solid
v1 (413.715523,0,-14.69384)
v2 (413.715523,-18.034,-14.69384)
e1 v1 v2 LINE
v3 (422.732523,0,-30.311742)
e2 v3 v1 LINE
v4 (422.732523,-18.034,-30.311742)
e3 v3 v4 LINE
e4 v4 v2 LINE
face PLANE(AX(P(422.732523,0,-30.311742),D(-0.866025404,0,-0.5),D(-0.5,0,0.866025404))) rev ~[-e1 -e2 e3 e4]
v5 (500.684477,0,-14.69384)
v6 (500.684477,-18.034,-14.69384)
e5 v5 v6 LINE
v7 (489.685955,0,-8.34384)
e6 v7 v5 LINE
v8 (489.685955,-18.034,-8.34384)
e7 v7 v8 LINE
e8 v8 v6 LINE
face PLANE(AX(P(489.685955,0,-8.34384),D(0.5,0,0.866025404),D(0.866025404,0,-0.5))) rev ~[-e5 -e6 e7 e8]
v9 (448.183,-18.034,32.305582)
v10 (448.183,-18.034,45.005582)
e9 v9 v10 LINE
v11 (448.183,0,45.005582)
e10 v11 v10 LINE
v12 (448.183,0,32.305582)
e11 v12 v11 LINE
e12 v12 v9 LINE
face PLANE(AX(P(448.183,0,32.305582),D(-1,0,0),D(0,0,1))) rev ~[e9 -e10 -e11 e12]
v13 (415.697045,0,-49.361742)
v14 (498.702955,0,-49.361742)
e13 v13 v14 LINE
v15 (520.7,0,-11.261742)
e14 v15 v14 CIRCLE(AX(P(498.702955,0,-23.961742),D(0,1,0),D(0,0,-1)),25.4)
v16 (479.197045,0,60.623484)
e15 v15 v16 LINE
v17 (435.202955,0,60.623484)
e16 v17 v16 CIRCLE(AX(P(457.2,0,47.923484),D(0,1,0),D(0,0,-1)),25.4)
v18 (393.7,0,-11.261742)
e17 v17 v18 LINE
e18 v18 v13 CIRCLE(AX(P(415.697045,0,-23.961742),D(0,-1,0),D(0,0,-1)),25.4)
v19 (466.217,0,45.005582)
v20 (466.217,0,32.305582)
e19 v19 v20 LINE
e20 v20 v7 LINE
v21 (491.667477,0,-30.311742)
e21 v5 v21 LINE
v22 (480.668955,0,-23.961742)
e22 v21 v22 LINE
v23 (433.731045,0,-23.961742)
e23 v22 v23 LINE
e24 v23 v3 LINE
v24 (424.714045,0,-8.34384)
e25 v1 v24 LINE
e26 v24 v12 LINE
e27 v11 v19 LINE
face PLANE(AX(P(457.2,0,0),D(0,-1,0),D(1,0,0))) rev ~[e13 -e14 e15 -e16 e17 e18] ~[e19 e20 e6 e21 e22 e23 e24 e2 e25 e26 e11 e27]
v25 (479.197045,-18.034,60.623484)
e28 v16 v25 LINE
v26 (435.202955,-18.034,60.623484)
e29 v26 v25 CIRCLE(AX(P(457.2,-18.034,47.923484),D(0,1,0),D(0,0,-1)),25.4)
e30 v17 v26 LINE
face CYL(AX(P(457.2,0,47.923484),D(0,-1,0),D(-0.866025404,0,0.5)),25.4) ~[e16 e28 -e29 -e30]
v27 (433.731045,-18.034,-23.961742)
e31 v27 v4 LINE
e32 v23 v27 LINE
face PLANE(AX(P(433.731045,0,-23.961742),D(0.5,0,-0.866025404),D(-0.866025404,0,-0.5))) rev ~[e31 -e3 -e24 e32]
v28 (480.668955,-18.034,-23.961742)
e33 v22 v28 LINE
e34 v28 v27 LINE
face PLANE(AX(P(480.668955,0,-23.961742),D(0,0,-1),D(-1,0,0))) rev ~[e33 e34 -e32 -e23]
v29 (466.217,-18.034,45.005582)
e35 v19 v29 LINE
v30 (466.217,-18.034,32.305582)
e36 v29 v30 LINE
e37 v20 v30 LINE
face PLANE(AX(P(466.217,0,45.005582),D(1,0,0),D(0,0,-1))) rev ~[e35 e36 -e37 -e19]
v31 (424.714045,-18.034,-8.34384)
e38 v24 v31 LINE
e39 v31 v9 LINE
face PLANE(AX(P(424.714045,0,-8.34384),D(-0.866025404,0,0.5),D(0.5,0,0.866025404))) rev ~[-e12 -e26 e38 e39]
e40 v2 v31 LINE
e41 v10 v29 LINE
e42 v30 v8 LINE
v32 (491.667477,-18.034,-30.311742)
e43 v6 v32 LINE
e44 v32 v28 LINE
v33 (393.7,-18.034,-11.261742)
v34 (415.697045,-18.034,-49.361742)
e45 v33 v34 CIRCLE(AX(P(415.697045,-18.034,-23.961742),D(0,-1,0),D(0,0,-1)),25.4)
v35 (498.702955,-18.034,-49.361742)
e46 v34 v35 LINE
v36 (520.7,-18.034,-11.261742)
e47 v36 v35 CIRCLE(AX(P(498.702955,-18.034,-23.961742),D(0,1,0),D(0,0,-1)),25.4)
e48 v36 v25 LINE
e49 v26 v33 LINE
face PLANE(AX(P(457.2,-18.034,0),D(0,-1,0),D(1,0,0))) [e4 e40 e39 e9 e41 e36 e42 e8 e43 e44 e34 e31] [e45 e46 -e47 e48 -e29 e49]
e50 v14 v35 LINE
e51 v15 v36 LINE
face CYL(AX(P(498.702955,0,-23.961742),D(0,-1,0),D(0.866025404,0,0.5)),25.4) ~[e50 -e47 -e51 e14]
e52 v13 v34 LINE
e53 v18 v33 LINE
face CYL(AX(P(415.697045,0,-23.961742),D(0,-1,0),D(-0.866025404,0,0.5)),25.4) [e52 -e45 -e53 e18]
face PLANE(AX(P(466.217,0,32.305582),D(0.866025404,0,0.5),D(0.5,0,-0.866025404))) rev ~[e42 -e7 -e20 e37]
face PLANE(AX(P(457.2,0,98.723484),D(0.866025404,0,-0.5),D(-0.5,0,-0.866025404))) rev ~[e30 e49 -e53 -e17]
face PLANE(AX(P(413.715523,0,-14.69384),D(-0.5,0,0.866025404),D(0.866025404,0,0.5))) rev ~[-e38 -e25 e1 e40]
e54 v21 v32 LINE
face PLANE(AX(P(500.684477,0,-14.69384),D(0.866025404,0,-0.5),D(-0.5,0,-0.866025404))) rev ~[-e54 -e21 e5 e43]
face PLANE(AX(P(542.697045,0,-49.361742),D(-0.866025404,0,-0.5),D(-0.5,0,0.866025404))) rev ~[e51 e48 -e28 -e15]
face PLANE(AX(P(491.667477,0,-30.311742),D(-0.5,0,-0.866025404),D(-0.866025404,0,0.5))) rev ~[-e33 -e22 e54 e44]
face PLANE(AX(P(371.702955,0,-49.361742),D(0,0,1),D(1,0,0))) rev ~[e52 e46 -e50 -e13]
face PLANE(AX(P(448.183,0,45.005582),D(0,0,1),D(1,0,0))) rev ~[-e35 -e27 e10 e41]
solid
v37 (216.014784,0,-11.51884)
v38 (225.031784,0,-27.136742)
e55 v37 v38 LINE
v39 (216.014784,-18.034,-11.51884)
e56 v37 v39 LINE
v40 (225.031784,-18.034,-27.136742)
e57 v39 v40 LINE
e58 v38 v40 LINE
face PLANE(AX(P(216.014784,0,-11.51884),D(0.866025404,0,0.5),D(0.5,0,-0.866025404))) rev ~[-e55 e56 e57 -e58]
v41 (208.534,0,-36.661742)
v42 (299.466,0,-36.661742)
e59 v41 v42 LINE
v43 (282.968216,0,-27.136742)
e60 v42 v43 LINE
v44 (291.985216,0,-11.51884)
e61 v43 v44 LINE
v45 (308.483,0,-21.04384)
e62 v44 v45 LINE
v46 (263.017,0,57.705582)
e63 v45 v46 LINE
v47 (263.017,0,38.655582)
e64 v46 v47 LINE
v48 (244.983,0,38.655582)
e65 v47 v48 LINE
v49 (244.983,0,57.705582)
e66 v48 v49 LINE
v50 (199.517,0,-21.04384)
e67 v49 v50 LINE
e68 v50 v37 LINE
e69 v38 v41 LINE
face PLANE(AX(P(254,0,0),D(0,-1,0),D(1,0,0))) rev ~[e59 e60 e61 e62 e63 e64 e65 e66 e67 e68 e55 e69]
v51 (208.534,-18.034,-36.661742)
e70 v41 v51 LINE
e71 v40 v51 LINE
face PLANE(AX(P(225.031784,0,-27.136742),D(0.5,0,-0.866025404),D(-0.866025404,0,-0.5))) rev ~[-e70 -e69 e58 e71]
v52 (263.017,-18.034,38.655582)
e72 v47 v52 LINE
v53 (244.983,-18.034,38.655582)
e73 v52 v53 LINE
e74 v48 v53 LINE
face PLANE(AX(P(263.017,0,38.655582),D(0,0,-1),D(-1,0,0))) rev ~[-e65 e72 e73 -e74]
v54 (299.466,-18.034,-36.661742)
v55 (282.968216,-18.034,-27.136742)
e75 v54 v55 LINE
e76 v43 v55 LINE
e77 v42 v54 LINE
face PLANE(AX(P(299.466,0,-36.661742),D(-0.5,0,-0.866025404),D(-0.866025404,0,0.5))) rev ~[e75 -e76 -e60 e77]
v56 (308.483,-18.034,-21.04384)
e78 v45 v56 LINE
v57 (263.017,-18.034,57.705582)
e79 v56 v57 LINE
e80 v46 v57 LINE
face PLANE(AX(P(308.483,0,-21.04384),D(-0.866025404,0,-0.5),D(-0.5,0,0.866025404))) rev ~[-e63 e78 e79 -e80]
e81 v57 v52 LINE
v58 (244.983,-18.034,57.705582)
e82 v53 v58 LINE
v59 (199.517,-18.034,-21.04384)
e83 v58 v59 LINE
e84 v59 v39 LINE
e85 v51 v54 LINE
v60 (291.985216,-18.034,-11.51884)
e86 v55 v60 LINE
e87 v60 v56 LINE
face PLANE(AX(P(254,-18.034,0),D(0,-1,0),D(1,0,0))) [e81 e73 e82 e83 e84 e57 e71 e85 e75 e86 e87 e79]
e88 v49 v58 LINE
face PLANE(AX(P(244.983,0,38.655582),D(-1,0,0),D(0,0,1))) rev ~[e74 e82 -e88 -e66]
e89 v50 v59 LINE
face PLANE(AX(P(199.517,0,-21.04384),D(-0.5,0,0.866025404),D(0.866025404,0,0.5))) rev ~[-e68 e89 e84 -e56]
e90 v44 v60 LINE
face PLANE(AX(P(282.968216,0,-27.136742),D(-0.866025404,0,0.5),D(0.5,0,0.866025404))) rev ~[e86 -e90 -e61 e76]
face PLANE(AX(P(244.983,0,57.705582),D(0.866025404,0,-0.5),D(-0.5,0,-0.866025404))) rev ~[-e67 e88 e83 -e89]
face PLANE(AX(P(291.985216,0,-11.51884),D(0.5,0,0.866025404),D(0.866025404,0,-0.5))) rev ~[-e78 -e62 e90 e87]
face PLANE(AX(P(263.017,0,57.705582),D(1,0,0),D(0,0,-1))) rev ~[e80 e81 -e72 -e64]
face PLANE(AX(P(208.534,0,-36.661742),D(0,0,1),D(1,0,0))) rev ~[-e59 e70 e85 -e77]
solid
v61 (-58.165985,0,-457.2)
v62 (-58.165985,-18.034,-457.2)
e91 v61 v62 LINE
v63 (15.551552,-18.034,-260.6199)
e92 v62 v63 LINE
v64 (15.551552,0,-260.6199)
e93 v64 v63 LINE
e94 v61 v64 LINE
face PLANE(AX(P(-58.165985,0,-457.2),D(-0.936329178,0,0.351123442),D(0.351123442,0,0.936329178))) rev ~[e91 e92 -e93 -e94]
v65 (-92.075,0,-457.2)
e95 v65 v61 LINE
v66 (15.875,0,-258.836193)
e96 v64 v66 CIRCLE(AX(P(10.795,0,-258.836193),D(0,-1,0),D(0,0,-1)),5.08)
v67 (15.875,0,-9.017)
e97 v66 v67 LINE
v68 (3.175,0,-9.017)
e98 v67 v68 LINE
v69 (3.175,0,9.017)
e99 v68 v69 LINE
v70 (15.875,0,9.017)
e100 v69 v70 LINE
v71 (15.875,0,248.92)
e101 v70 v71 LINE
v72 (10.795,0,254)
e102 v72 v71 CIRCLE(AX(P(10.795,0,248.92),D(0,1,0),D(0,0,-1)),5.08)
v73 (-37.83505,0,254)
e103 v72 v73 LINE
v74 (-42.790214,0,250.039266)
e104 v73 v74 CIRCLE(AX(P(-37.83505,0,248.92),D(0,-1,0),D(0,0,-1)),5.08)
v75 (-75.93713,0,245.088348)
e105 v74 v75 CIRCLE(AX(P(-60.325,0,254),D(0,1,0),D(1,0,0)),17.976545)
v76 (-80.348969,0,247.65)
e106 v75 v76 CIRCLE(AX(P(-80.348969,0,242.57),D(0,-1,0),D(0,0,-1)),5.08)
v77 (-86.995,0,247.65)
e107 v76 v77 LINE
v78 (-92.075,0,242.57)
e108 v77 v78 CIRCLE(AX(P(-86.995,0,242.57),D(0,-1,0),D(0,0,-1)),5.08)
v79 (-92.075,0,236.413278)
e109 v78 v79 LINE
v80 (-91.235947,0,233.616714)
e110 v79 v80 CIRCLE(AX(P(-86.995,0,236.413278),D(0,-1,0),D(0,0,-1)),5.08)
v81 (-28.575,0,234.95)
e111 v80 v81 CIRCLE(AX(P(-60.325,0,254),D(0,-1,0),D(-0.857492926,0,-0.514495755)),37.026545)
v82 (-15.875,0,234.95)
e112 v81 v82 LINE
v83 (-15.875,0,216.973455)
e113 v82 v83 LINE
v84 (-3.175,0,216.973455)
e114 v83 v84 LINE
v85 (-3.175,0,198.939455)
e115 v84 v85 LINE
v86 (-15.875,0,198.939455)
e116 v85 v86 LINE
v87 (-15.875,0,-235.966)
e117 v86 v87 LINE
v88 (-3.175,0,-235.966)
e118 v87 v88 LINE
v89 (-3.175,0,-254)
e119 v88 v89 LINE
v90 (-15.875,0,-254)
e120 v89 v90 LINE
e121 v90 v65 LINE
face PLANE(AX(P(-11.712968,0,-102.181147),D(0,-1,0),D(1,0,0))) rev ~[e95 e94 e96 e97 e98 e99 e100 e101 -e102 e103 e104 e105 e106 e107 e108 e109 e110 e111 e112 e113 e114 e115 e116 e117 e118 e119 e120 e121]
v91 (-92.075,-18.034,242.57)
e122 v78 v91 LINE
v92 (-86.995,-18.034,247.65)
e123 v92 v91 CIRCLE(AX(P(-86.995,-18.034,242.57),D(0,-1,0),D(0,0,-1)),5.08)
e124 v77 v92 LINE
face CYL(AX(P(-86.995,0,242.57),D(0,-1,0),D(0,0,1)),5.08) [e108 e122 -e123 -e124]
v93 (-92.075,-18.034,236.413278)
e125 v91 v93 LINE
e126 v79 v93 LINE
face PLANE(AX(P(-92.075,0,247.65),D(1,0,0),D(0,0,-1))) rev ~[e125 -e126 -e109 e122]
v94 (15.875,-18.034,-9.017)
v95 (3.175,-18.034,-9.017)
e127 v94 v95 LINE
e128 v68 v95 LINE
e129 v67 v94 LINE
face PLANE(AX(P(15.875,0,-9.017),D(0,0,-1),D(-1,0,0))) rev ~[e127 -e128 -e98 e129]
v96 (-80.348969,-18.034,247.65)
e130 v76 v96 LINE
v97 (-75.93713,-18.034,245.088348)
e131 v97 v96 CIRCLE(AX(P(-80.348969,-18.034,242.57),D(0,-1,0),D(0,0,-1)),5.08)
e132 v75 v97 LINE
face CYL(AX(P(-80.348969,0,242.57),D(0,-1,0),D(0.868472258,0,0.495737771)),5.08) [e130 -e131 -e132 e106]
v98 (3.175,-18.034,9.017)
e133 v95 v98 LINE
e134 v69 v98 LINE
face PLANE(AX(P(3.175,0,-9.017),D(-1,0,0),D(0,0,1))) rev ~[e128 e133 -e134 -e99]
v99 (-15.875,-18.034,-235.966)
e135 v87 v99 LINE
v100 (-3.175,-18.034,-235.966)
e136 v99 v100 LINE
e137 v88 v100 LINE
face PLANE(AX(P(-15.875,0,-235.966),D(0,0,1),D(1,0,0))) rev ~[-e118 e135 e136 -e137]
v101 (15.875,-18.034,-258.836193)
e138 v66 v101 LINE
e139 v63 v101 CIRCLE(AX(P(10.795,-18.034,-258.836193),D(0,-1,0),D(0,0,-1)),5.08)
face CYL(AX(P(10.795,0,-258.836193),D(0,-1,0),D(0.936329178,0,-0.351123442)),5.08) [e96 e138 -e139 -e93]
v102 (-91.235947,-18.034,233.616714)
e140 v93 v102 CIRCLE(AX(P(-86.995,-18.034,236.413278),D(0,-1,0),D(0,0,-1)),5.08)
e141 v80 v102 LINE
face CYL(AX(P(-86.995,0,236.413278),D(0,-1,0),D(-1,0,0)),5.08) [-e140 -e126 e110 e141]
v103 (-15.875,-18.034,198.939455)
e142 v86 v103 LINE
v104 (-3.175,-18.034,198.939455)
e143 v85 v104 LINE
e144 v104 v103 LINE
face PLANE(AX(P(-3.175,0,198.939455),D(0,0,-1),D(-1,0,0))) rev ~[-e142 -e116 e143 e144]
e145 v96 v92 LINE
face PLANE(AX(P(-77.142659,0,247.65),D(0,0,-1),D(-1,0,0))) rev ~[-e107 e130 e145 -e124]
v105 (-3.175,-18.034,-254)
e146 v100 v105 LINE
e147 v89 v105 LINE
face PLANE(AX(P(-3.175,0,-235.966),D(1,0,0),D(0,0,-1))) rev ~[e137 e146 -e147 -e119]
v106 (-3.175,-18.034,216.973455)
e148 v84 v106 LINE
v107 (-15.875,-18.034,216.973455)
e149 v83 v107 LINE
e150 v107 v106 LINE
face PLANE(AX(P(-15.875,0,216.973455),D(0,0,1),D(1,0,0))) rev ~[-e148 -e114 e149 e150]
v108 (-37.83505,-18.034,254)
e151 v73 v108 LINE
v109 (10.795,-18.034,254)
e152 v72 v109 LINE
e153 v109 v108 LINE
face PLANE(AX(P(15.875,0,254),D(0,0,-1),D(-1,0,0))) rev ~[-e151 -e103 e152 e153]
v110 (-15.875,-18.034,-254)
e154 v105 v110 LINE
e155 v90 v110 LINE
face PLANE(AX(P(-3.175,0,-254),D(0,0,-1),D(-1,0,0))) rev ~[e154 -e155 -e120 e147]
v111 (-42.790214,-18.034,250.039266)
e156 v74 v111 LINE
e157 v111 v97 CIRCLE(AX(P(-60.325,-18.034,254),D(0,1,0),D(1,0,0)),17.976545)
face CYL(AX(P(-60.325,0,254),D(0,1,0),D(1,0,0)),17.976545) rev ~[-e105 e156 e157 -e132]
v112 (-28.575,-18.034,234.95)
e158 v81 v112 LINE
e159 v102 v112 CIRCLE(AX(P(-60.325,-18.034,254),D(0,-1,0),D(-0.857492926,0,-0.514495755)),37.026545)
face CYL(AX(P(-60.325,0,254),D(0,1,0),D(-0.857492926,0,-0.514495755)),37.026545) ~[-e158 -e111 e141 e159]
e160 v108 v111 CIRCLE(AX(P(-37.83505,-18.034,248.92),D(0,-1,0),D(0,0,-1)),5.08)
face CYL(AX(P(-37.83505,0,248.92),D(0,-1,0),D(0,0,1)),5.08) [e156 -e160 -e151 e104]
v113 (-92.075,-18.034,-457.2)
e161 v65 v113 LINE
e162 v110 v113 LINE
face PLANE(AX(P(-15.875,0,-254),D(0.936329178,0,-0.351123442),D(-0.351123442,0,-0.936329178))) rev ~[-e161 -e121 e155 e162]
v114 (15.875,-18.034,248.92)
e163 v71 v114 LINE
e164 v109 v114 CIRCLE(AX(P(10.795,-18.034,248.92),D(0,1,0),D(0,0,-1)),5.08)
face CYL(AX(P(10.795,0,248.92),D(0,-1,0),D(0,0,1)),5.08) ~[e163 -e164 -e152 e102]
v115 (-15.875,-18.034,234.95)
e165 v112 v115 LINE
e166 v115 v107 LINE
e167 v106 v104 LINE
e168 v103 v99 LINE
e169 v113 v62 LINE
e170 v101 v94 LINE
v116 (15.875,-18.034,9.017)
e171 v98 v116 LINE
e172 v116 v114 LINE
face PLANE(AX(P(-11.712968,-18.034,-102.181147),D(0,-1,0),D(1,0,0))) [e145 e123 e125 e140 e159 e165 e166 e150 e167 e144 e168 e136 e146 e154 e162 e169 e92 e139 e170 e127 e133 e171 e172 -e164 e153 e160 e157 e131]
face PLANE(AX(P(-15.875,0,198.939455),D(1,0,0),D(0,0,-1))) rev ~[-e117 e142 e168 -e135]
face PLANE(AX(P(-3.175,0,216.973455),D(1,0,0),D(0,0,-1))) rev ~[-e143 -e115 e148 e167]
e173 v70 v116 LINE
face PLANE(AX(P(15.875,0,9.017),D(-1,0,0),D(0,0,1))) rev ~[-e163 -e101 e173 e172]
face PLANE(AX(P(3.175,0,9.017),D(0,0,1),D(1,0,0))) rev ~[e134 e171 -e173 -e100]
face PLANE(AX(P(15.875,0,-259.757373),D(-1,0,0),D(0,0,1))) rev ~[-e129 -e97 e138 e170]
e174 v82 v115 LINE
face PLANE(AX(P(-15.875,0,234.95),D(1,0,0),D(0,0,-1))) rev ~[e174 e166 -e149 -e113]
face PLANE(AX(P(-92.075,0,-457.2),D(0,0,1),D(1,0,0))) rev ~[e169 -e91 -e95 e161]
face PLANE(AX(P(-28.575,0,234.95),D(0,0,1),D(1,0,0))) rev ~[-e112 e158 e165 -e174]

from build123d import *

# Parameters (mm, degrees)
F2_DEPTH = 18.034
F1_W     = 12.7
F1_H     = 19.05
F3_R     = 25.4
F4_R     = 5.08


# Not quite as in the source:
# - a variable given as a bare number and used for a length is read in inches; the dataset says mm whatever the document's units were


with BuildPart() as f2:
    # F1 (on Front) → F2 (new body)
    with BuildSketch(Plane.XZ):
        Polygon((457.2, 98.7234841871), (371.7029547439, -49.3617420935), (542.6970452561, -49.3617420935), align=None)
        Polygon((448.183, 32.3055820552), (448.183, 45.0055820552), (466.217, 45.0055820552), (466.217, 32.3055820552), (489.6859547439, -8.3438399617), (500.6844773719, -14.6938399617), (491.6674773719, -30.3117420935), (480.6689547439, -23.9617420935), (433.7310452561, -23.9617420935), (422.7325226281, -30.3117420935), (413.7155226281, -14.6938399617), (424.7140452561, -8.3438399617), align=None, mode=Mode.SUBTRACT)
    extrude(amount=F2_DEPTH)

    # F3
    f3_edges = [f2.edges().sort_by_distance(p)[0] for p in [
        (457.2, -9.017, 98.723484),
        (542.697045, -9.017, -49.361742),
        (371.702955, -9.017, -49.361742),
    ]]
    fillet(f3_edges, radius=F3_R)


with BuildPart() as f2b:
    # F1 (on Front) → F2, piece 2 (new body)
    with BuildSketch(Plane.XZ):
        Polygon((308.483, -21.0438399617), (263.017, 57.7055820552), (263.017, 38.6555820552), (244.983, 38.6555820552), (244.983, 57.7055820552), (199.517, -21.0438399617), (216.0147839421, -11.5188399617), (225.0317839421, -27.1367420935), (208.534, -36.6617420935), (299.466, -36.6617420935), (282.9682160579, -27.1367420935), (291.9852160579, -11.5188399617), align=None)
    extrude(amount=F2_DEPTH)


with BuildPart() as f2c:
    # F1 (on Front) → F2, piece 3 (new body)
    with BuildSketch(Plane.XZ):
        Polygon((15.875, 254), (-15.875, 254), (-15.875, 234.95), (-15.875, 216.9734554677), (-3.175, 216.9734554677), (-3.175, 198.9394554677), (-15.875, 198.9394554677), (-15.875, -235.966), (-3.175, -235.966), (-3.175, -254), (-15.875, -254), (-92.075, -457.2), (-58.1659851358, -457.2), (15.875, -259.7573729713), (15.875, -9.017), (3.175, -9.017), (3.175, 0), (3.175, 9.017), (15.875, 9.017), align=None)
        with Locations((-22.225, 244.475)):
            Rectangle(F1_W, F1_H)
        with BuildLine():
            Line((-28.575, 234.95), (-28.575, 254))
            Line((-28.575, 254), (-42.3484554677, 254))
            ThreePointArc((-42.3484554677, 254), (-57.0975584537, 236.315549927), (-77.1426589727, 247.65))
            Line((-77.1426589727, 247.65), (-92.075, 247.65))
            Line((-92.075, 247.65), (-92.075, 234.95))
            ThreePointArc((-92.075, 234.95), (-60.325, 216.9734554677), (-28.575, 234.95))
        make_face()
    extrude(amount=F2_DEPTH)

    # F4
    f4_edges = [f2c.edges().sort_by_distance(p)[0] for p in [
        (15.875, -9.017, -259.757373),
        (15.875, -9.017, 254),
        (-42.348455, -9.017, 254),
        (-77.142659, -9.017, 247.65),
        (-92.075, -9.017, 247.65),
        (-92.075, -9.017, 234.95),
    ]]
    fillet(f4_edges, radius=F4_R)


solid = Compound([f2.part, f2b.part, f2c.part])
